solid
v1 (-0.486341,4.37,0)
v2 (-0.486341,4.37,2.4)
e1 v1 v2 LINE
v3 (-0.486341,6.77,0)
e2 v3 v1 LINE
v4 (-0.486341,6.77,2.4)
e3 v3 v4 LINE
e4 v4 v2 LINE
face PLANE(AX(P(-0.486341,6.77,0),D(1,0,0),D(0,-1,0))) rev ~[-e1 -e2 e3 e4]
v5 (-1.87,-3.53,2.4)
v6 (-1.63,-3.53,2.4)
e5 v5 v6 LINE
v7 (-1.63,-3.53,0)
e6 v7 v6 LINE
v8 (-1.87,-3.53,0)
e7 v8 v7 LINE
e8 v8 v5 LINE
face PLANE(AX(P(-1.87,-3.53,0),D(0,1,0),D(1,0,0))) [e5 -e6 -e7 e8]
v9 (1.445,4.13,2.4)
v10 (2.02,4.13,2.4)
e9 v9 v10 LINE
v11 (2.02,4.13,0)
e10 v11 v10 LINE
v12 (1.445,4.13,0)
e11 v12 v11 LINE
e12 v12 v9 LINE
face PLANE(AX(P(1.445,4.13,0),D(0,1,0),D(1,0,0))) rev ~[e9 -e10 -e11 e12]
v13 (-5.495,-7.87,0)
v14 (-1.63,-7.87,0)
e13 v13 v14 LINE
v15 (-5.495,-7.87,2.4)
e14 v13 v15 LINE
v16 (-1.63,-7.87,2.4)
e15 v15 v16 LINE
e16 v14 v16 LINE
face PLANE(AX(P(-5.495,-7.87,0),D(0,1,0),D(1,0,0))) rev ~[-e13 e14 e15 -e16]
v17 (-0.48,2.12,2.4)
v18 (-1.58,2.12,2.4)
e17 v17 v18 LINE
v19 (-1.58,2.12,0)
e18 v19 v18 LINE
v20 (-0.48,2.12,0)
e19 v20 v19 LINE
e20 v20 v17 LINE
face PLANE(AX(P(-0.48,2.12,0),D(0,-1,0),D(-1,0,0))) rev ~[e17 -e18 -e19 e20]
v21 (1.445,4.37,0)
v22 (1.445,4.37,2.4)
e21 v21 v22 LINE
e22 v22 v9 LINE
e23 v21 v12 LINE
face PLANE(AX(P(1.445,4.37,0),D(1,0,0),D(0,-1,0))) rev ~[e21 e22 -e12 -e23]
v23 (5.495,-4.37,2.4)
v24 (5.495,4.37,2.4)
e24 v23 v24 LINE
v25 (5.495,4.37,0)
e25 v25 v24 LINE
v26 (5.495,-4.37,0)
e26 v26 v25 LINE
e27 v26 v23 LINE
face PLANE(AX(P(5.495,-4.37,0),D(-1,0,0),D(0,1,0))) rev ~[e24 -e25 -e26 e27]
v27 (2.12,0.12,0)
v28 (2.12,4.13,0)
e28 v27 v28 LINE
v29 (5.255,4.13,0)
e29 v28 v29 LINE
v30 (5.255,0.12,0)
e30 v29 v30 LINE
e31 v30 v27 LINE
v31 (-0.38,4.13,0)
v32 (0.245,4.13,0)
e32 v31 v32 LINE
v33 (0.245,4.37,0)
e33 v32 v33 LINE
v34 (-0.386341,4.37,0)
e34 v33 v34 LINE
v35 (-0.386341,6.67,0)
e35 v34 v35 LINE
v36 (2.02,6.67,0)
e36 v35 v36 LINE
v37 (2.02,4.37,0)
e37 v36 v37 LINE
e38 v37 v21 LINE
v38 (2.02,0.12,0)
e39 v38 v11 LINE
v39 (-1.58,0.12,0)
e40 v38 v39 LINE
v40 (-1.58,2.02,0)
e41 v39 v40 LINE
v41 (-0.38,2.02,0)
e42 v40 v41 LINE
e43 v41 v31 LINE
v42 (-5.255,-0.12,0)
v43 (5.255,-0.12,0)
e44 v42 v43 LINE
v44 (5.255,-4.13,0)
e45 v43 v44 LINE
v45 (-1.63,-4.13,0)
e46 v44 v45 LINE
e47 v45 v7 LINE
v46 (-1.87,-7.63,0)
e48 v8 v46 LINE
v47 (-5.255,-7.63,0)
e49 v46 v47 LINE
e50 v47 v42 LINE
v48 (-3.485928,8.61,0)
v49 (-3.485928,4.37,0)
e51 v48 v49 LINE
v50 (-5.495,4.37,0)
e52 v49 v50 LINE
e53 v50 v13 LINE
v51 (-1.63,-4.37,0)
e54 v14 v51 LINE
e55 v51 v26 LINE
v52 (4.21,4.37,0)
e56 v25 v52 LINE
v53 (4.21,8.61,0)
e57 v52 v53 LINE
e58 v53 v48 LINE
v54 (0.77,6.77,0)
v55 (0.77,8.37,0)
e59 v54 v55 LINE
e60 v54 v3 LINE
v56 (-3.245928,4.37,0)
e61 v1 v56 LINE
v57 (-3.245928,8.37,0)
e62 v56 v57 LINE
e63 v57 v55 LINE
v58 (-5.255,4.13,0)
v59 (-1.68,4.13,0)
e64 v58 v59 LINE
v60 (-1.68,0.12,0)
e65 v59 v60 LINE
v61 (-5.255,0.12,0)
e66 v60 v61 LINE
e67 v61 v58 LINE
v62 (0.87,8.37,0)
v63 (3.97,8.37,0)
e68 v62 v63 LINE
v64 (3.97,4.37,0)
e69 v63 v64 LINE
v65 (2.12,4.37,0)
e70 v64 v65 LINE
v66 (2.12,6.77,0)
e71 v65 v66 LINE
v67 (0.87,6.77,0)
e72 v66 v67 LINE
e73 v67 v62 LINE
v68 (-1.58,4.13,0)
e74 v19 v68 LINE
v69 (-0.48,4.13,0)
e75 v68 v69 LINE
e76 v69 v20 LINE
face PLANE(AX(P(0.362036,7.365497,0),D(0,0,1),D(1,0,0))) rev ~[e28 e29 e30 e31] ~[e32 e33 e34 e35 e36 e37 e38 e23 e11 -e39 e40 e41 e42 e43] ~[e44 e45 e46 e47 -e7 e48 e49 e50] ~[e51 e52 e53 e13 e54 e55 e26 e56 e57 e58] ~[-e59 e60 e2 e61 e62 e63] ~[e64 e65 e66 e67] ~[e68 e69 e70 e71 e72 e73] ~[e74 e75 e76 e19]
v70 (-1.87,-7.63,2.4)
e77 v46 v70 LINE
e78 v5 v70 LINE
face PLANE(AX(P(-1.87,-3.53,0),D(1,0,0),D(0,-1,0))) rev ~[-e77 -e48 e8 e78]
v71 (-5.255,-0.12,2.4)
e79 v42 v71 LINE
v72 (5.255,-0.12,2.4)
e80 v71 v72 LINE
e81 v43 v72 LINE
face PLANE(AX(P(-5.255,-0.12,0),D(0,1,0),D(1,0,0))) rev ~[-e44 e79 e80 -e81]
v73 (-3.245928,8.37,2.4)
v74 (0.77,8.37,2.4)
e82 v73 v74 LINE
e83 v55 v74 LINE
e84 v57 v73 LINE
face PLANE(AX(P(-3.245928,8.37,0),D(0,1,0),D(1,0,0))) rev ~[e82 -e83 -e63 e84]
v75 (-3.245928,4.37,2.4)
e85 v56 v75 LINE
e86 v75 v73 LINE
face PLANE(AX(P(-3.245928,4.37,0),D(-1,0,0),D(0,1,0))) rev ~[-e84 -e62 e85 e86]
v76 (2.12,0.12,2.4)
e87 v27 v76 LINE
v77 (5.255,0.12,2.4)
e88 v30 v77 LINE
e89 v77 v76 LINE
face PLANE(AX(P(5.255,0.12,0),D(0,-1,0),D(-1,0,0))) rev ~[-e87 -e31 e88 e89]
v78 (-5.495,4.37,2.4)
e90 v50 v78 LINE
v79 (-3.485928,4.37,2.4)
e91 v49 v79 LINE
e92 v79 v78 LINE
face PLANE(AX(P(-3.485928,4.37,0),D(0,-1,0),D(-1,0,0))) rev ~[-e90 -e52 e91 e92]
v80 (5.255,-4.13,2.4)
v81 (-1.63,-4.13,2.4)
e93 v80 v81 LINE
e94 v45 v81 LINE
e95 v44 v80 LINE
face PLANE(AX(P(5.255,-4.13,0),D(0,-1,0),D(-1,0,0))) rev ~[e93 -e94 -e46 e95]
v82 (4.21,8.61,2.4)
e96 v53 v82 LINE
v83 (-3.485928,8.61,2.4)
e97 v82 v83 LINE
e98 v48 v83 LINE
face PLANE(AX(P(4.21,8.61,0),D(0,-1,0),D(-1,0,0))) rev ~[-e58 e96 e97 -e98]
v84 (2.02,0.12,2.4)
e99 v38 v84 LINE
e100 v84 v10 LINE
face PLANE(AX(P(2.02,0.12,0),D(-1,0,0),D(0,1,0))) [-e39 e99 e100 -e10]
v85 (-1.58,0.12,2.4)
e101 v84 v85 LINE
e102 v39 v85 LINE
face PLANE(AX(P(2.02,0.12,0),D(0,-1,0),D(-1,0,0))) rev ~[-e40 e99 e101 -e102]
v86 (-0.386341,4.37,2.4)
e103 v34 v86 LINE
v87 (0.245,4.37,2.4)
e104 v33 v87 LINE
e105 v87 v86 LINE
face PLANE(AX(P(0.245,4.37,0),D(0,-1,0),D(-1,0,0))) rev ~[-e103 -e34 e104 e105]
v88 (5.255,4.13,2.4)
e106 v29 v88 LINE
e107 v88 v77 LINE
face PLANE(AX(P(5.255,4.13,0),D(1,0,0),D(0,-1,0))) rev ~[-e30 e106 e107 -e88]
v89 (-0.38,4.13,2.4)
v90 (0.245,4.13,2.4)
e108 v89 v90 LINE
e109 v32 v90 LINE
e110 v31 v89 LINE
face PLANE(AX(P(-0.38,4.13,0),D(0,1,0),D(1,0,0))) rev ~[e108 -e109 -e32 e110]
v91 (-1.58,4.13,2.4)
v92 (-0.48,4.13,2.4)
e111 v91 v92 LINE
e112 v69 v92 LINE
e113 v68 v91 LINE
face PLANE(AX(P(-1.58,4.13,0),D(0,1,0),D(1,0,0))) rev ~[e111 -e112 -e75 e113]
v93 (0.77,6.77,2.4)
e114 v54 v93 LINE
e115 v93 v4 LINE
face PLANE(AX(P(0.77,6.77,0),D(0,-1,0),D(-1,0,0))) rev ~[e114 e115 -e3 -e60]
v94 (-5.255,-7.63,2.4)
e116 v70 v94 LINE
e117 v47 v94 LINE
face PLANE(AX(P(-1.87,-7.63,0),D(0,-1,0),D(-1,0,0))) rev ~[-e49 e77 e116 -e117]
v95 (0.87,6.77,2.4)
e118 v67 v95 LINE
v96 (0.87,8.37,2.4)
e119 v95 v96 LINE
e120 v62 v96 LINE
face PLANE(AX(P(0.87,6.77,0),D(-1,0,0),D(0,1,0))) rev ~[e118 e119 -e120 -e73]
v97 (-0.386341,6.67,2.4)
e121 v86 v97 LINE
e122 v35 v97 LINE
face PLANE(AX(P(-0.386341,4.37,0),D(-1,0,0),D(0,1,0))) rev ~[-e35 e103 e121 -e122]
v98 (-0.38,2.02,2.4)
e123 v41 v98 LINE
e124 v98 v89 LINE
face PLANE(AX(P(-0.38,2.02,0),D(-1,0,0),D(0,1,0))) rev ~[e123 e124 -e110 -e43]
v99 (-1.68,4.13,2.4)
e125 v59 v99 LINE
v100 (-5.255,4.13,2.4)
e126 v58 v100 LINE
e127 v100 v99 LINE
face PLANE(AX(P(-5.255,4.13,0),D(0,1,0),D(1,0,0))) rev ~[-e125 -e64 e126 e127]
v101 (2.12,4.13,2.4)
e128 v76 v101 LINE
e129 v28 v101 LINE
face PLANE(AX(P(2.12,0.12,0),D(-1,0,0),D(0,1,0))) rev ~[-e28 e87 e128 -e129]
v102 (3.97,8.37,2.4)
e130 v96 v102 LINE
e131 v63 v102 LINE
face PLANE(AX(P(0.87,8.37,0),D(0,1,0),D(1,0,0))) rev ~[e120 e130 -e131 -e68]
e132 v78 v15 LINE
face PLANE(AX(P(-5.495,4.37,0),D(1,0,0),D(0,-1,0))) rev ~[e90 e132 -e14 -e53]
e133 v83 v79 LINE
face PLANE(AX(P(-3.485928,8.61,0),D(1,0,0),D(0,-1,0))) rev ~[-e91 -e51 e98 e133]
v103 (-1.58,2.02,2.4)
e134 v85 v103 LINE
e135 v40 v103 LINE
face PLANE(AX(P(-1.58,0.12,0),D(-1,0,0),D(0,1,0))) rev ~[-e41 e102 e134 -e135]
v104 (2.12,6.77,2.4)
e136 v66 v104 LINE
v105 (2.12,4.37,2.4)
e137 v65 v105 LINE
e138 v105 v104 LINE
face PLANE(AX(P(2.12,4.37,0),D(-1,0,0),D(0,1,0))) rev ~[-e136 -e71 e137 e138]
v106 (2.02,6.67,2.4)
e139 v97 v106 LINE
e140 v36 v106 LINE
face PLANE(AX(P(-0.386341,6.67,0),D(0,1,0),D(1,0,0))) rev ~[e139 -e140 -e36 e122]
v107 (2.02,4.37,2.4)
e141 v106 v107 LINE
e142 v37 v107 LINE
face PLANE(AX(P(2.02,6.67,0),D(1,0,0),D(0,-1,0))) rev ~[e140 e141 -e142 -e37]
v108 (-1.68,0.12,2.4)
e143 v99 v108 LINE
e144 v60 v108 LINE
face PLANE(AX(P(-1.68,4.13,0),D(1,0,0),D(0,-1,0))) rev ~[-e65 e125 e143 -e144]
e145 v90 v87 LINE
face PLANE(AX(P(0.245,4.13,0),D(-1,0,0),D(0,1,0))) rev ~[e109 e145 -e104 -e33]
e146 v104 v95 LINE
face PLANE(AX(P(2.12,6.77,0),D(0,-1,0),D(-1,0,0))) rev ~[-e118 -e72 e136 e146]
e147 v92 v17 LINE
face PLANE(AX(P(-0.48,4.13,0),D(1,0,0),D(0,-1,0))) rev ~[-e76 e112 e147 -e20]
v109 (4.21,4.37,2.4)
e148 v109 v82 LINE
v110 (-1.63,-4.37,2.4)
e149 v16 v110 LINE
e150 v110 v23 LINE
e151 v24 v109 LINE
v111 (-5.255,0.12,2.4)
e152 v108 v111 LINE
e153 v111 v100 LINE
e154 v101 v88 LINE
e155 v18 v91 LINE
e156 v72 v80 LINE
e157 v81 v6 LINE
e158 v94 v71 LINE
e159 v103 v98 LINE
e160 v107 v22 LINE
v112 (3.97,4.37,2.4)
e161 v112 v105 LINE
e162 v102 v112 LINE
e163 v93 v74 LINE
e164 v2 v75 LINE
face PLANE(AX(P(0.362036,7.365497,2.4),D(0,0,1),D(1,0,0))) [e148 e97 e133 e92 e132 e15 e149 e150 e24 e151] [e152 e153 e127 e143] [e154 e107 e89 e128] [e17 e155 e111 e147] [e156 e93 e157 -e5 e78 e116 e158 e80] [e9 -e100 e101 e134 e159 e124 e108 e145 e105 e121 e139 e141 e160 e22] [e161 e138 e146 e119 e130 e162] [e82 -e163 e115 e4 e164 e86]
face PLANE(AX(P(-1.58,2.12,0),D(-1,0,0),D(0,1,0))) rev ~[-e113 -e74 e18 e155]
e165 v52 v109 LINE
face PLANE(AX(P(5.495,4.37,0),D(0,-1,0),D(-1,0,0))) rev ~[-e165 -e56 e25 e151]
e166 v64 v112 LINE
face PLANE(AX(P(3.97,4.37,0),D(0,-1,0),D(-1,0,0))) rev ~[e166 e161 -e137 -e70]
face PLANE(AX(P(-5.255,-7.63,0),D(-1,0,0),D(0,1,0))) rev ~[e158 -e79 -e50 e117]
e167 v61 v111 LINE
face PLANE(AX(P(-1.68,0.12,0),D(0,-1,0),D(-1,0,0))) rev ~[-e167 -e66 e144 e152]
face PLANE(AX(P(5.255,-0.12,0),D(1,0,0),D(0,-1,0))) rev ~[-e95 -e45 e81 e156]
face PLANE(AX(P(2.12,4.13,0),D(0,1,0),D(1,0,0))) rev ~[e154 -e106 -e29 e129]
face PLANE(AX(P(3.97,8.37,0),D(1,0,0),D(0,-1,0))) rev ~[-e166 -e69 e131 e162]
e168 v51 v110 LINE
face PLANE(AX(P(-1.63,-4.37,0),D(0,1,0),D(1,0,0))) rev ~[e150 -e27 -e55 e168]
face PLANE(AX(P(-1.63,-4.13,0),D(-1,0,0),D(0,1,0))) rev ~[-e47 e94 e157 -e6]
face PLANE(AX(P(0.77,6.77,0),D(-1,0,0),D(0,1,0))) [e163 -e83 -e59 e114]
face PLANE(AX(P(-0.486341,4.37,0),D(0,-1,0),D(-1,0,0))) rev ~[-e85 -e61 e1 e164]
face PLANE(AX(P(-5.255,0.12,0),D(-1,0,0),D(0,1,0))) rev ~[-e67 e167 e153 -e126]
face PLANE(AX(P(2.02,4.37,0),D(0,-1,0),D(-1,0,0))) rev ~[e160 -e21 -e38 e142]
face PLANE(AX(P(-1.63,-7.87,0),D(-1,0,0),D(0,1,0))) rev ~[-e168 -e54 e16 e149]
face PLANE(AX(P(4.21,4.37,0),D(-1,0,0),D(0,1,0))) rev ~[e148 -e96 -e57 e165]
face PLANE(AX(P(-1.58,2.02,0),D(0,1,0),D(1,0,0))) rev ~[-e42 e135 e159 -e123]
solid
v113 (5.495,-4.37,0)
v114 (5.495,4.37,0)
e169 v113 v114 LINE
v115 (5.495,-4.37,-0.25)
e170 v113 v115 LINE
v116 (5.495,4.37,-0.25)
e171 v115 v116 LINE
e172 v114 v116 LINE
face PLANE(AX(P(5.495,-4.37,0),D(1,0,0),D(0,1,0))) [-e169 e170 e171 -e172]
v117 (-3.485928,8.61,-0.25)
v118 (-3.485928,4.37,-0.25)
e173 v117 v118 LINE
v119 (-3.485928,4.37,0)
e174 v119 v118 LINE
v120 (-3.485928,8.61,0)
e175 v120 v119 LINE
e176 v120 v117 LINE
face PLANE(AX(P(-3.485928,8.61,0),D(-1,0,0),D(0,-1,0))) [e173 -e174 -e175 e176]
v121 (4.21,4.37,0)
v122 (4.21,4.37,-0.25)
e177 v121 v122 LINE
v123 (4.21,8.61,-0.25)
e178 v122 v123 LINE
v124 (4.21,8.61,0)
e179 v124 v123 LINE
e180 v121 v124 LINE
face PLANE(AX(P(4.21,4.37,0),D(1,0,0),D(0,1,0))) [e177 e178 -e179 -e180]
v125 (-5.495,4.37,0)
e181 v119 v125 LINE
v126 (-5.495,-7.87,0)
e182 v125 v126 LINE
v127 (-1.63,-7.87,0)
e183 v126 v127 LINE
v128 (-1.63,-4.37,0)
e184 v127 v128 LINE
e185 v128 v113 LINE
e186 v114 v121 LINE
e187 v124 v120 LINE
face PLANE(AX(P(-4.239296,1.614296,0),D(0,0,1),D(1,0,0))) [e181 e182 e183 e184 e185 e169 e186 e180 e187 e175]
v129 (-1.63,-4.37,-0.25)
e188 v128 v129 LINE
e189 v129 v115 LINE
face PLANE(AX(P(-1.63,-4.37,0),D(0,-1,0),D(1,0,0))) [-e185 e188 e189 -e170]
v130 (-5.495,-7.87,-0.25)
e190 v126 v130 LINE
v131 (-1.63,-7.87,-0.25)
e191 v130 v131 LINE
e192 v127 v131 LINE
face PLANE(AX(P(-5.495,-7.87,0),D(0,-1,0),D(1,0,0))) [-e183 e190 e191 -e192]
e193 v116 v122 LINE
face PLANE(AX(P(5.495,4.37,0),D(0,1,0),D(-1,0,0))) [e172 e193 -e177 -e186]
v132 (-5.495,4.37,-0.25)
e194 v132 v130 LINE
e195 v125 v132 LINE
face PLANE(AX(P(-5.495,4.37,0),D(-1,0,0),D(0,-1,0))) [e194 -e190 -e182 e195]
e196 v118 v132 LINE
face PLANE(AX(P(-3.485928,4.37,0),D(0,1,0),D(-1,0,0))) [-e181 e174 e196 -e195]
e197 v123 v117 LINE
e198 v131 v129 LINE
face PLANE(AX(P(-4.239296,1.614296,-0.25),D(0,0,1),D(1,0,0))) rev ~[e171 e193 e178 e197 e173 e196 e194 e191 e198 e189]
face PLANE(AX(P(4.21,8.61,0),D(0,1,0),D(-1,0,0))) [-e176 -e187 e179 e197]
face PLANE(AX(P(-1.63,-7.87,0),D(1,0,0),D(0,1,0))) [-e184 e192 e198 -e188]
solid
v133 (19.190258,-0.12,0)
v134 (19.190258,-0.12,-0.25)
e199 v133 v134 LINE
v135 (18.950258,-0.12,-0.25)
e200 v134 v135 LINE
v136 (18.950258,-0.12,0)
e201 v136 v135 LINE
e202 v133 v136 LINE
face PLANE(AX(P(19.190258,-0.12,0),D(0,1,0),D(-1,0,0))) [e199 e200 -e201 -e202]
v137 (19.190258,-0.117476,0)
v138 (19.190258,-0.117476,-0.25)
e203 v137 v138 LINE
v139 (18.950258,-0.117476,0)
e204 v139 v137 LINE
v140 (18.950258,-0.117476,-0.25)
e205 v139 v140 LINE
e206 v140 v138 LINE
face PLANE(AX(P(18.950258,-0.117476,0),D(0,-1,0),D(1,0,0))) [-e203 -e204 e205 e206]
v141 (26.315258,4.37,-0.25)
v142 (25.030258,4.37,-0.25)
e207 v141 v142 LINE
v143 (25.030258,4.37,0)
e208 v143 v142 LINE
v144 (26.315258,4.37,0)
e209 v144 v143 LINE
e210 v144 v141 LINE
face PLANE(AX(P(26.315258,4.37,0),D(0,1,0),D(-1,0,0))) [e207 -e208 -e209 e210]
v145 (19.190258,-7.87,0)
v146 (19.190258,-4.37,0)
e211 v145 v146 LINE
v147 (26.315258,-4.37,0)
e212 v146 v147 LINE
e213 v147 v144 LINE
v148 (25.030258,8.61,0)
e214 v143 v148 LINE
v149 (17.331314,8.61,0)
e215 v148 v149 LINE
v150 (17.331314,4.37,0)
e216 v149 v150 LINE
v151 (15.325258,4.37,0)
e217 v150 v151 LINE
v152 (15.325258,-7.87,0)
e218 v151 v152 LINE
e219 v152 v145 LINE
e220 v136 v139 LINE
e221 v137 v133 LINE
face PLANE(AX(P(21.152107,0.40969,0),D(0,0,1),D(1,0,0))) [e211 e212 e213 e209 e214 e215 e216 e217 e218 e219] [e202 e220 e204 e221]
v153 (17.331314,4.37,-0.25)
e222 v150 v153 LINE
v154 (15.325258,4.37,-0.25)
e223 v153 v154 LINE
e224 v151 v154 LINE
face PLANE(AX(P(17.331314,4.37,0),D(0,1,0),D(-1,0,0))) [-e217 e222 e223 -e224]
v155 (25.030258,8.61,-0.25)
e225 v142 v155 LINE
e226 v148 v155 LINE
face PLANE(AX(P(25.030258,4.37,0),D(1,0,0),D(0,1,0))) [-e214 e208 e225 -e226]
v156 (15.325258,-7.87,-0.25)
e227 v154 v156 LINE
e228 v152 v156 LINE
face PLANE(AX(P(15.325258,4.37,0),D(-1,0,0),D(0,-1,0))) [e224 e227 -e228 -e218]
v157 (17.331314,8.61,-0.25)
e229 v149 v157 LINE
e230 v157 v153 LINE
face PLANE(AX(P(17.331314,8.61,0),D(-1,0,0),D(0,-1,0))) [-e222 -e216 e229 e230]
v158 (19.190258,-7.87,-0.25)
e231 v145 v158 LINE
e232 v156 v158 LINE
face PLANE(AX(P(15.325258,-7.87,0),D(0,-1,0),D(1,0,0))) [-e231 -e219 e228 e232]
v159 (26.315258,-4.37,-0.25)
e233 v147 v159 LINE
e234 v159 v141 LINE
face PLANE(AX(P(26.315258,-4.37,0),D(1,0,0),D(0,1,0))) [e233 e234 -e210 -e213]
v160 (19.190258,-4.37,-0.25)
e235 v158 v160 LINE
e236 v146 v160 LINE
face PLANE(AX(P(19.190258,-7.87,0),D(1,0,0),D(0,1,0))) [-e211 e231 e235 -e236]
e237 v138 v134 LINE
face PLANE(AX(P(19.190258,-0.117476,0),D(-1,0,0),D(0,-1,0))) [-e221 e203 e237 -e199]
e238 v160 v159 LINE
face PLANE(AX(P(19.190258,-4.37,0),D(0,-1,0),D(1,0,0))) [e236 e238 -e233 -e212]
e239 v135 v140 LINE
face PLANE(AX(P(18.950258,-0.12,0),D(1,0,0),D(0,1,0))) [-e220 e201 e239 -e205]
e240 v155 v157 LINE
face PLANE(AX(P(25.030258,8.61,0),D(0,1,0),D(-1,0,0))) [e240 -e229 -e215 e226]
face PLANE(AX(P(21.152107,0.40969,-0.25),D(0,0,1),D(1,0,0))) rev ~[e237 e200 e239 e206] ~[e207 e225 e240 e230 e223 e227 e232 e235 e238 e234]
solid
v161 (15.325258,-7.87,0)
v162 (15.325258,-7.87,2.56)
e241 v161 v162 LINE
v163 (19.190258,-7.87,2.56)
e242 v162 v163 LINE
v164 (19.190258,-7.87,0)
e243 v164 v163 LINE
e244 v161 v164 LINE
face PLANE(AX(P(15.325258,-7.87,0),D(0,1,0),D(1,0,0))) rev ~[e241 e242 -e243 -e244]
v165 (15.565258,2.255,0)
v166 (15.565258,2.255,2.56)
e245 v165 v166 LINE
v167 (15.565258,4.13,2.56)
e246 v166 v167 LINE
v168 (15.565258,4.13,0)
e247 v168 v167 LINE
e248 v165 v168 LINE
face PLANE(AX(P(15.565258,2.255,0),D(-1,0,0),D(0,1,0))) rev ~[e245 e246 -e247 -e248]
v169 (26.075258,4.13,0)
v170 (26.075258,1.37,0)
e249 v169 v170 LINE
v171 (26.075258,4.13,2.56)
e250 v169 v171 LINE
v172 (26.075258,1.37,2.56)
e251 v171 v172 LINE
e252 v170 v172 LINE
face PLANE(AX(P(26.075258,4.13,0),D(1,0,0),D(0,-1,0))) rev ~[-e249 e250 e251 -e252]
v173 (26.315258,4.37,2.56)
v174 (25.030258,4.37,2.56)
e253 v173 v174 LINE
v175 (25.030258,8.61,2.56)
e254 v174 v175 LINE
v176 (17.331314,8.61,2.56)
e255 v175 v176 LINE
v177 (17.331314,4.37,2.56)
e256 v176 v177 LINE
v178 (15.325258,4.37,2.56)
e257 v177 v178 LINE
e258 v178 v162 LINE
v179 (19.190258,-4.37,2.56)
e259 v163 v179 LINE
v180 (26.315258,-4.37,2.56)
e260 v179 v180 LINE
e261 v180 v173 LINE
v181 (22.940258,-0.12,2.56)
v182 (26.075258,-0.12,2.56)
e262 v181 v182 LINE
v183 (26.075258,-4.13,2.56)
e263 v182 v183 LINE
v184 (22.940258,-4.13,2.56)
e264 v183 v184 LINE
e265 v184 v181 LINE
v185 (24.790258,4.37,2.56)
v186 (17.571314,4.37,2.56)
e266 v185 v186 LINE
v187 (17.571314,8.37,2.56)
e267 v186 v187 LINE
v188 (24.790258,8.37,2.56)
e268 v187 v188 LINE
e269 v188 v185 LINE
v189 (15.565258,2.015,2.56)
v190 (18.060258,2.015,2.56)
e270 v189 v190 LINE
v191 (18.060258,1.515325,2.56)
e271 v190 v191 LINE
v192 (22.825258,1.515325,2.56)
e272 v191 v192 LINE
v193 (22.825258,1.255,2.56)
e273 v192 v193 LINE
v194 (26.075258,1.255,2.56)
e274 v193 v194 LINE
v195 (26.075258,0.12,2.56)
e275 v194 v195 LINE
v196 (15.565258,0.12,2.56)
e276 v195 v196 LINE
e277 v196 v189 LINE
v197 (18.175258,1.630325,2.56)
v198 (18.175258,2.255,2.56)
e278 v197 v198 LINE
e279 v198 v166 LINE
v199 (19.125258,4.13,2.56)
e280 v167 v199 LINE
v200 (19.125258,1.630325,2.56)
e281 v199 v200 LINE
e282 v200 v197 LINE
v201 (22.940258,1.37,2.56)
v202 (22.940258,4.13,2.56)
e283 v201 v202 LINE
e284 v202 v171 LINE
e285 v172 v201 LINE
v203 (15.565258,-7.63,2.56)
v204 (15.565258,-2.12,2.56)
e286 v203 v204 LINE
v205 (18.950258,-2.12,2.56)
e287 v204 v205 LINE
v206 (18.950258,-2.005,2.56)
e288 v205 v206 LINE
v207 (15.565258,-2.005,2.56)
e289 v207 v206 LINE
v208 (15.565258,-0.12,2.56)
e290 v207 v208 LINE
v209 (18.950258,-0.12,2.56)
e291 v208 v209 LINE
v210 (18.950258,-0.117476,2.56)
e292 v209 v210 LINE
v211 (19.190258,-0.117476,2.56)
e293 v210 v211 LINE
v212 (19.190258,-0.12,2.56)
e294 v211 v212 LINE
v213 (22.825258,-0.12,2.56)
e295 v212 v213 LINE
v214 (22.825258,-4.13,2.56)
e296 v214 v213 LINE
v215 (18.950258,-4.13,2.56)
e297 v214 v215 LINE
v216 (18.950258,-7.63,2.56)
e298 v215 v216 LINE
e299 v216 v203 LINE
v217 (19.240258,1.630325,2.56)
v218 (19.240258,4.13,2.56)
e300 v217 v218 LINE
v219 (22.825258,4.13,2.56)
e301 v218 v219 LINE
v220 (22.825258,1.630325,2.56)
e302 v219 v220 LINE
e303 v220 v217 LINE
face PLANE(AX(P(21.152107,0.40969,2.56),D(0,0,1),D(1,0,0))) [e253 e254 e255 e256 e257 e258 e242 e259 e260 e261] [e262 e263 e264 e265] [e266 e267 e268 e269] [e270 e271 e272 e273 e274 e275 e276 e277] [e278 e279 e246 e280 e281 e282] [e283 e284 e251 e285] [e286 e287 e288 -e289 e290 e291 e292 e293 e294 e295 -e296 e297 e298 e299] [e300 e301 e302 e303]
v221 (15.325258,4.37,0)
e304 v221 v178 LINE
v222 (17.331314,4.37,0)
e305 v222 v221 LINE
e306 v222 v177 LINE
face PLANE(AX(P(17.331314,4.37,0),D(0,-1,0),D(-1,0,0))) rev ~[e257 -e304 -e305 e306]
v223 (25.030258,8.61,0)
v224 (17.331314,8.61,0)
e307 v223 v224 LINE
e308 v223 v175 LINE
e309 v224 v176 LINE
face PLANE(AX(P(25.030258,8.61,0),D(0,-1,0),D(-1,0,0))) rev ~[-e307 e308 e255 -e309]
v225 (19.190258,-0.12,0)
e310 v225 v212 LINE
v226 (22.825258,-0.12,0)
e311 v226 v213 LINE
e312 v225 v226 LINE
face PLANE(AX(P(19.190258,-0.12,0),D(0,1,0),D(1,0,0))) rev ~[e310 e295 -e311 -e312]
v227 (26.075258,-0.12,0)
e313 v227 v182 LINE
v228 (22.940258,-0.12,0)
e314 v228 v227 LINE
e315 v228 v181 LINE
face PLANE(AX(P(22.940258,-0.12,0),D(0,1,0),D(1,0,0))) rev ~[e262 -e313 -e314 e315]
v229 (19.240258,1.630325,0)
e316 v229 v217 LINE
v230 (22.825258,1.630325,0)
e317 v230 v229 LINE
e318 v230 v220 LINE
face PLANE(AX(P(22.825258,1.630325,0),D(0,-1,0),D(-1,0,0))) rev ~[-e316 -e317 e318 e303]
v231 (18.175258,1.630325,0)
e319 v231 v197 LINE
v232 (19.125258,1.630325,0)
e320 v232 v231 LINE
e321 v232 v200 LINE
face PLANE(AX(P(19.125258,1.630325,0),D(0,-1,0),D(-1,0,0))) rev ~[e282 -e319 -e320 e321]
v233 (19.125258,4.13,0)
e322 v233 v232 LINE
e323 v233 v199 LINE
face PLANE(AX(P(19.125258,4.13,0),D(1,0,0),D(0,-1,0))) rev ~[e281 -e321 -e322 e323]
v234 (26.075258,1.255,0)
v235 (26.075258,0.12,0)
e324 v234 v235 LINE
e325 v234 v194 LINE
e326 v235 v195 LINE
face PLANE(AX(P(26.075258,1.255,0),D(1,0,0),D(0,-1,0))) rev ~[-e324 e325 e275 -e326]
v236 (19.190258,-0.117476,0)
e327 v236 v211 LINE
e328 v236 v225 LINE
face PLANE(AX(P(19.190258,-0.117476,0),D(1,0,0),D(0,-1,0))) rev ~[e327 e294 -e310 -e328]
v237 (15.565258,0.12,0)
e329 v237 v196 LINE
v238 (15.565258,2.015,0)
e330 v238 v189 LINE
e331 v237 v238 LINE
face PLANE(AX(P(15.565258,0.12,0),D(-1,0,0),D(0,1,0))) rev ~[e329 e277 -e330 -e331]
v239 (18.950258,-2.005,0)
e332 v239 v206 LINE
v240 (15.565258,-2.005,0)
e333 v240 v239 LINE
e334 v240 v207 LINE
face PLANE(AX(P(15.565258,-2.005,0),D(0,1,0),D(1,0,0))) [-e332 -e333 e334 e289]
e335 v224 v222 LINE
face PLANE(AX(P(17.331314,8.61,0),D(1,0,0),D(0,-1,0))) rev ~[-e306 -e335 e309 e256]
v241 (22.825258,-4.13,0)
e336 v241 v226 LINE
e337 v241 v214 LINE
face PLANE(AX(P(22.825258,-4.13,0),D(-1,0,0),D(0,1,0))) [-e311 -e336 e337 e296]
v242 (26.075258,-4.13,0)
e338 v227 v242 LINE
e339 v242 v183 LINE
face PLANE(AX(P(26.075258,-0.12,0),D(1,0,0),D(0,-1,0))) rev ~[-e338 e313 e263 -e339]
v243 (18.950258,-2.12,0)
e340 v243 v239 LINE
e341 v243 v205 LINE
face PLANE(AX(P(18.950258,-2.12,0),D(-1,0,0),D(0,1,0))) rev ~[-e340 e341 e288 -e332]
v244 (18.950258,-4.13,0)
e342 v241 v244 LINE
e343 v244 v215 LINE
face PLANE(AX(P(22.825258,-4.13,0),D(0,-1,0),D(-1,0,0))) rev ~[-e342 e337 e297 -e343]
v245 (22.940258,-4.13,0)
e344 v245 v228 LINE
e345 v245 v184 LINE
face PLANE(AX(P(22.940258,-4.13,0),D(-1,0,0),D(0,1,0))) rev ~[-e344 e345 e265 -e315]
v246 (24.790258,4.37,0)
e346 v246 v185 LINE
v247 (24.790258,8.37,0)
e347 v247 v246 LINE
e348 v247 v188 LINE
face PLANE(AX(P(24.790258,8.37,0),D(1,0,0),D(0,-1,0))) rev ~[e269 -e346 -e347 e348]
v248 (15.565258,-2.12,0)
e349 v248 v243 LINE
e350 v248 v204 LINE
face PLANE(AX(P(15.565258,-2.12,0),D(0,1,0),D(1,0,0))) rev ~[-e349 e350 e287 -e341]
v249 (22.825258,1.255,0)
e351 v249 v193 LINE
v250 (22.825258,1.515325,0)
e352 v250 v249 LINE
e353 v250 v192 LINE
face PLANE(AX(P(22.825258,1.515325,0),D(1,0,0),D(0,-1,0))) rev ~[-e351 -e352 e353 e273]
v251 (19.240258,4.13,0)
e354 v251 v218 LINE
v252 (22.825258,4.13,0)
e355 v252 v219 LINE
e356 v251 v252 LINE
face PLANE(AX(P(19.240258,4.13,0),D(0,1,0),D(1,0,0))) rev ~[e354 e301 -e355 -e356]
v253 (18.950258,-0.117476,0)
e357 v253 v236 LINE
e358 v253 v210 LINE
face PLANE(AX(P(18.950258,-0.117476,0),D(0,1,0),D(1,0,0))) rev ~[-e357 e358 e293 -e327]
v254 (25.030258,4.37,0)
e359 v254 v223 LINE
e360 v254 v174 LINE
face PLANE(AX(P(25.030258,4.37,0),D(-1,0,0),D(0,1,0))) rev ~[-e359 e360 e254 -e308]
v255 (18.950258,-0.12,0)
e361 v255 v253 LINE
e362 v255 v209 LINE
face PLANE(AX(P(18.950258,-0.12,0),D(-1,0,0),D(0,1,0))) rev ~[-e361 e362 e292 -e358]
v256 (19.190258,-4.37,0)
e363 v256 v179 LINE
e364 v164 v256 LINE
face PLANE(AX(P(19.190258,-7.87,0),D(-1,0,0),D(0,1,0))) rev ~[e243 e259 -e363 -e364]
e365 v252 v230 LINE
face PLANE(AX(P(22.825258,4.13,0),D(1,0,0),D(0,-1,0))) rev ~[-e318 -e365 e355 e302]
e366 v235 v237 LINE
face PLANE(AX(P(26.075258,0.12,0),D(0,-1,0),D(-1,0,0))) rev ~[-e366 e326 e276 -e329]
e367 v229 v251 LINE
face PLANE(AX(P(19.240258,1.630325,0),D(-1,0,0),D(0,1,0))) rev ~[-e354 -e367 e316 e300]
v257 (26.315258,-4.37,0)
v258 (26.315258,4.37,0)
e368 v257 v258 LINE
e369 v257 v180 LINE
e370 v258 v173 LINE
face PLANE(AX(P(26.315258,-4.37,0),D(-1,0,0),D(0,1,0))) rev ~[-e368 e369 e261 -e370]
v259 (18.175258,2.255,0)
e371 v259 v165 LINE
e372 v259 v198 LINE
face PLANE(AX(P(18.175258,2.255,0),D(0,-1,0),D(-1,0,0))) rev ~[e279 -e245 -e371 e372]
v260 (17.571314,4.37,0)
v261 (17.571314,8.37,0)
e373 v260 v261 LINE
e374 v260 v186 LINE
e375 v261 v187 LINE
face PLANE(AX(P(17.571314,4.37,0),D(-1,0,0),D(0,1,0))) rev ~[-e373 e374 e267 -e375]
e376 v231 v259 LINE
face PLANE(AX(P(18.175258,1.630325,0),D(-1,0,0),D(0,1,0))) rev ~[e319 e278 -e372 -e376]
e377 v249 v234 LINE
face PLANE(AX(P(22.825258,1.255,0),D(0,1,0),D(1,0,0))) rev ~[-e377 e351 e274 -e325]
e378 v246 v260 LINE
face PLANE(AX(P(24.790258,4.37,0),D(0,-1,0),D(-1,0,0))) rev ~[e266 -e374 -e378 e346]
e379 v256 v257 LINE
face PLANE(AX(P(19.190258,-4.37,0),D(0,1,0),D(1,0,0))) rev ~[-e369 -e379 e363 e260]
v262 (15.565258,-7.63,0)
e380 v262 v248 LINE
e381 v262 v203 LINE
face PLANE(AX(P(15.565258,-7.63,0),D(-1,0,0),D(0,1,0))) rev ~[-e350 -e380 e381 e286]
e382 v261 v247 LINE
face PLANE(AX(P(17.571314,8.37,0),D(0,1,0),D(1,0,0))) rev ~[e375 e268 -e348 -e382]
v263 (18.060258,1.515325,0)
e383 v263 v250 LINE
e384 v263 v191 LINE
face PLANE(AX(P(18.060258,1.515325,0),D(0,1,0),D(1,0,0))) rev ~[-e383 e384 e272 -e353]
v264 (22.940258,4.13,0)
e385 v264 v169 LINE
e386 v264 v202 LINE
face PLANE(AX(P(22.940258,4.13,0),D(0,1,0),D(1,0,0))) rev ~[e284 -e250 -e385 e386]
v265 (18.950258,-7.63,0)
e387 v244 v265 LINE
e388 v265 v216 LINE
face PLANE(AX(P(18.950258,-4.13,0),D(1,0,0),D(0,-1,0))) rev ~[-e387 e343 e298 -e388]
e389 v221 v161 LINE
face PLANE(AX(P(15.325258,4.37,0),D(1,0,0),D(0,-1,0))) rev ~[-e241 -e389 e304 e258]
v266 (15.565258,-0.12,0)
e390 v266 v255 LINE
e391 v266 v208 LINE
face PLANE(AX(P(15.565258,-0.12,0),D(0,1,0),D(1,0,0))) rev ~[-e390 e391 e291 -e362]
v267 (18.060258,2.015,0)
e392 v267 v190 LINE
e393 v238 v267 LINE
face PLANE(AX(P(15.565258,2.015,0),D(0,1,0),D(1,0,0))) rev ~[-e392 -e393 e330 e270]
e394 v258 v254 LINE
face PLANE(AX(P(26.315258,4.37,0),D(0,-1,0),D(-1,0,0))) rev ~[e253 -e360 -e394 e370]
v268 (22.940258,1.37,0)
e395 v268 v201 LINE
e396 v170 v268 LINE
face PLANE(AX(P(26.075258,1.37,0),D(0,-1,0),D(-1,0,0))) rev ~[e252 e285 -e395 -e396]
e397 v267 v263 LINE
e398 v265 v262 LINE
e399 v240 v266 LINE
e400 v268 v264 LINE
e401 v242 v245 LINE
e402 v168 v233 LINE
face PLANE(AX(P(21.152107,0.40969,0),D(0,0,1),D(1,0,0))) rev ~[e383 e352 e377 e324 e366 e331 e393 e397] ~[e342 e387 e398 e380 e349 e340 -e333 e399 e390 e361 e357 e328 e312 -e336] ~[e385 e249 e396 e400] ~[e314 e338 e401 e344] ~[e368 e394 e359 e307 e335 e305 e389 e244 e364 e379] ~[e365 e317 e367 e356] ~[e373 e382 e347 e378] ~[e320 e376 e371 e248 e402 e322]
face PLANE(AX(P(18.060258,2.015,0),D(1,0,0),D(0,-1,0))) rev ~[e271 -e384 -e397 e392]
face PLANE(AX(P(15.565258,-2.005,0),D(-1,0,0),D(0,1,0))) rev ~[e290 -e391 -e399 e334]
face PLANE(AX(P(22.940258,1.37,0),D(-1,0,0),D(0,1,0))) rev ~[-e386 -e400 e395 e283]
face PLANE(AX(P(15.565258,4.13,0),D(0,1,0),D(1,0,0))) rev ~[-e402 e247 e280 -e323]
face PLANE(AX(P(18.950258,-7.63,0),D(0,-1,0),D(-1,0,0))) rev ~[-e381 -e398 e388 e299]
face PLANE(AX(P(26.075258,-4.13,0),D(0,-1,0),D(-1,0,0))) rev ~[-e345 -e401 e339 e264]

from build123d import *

# Parameters (mm, degrees)
F0_W     = 3.385
F0_H     = 0.24
F0_H_2   = 3.26
F0_W_2   = 0.24
F0_W_3   = 0.1
F0_H_3   = 1.6
F0_H_4   = 0.6
F0_W_4   = 3.575
F0_H_5   = 4.01
F0_W_5   = 3.135
F0_W_6   = 1.2
F0_W_7   = 1.1
F0_H_6   = 2.01
F1_DEPTH = 0.25
F0_H_7   = 0.115
F0_W_8   = 3.635
F0_H_8   = 1.885
F0_W_9   = 0.115
F0_H_9   = 2.76
F2_DEPTH = 2.56
F3_DEPTH = 2.4


with BuildPart() as f1:
    # F0 (on Top) → F1 (new body)
    with BuildSketch(Plane.XY):
        Polygon((-3.4859280568, 4.37), (-5.495, 4.37), (-5.495, -4.37), (-5.255, -4.37), (-5.255, -4.13), (-5.255, -0.12), (-5.255, 0.12), (-5.255, 4.13), (-1.68, 4.13), (-1.58, 4.13), (-0.48, 4.13), (-0.38, 4.13), (0.245, 4.13), (0.245, 4.37), (-0.38, 4.37), (-0.386341276, 4.37), (-0.48, 4.37), (-0.486341276, 4.37), (-3.2459280568, 4.37), align=None)
        Polygon((-3.4859280568, 8.61), (-3.4859280568, 4.37), (-3.2459280568, 4.37), (-3.2459280568, 8.37), (0.77, 8.37), (0.87, 8.37), (3.97, 8.37), (3.97, 4.37), (4.21, 4.37), (4.21, 8.61), align=None)
        Polygon((-5.255, -4.37), (-5.495, -4.37), (-5.495, -7.87), (-1.63, -7.87), (-1.63, -4.37), (-1.87, -4.37), (-1.87, -7.63), (-5.255, -7.63), align=None)
        Polygon((-3.2459280568, 8.37), (-3.2459280568, 4.37), (-0.486341276, 4.37), (-0.486341276, 6.77), (-0.48, 6.77), (0.77, 6.77), (0.77, 8.37), align=None)
        with Locations((-3.5625, -4.25)):
            Rectangle(F0_W, F0_H)
        with Locations((-3.5625, -6)):
            Rectangle(F0_W, F0_H_2)
        Polygon((-0.486341276, 6.77), (-0.486341276, 4.37), (-0.48, 4.37), (-0.386341276, 4.37), (-0.386341276, 6.67), (-0.38, 6.67), (2.02, 6.67), (2.02, 4.37), (2.12, 4.37), (2.12, 6.5391240641), (2.12, 6.77), (0.87, 6.77), (0.77, 6.77), (-0.48, 6.77), align=None)
        with Locations((-1.75, -4.25)):
            Rectangle(F0_W_2, F0_H)
        Polygon((-5.255, -0.12), (-5.255, -4.13), (-1.87, -4.13), (-1.87, -3.53), (-1.63, -3.53), (-1.63, -4.13), (5.255, -4.13), (5.255, -0.12), align=None)
        with Locations((0.82, 7.57)):
            Rectangle(F0_W_3, F0_H_3)
        Polygon((5.495, 4.37), (4.21, 4.37), (3.97, 4.37), (2.12, 4.37), (2.02, 4.37), (1.445, 4.37), (1.445, 4.13), (2.02, 4.13), (2.12, 4.13), (5.255, 4.13), (5.255, 0.12), (5.255, -0.12), (5.255, -4.13), (-1.63, -4.13), (-1.63, -4.37), (5.495, -4.37), align=None)
        with Locations((-1.75, -3.83)):
            Rectangle(F0_W_2, F0_H_4)
        Polygon((-5.255, 0.12), (-5.255, -0.12), (5.255, -0.12), (5.255, 0.12), (2.12, 0.12), (2.02, 0.12), (-1.58, 0.12), (-1.68, 0.12), align=None)
        Polygon((-0.386341276, 6.67), (-0.386341276, 4.37), (-0.38, 4.37), (0.245, 4.37), (1.445, 4.37), (2.02, 4.37), (2.02, 6.67), (-0.38, 6.67), align=None)
        Polygon((3.97, 8.37), (0.87, 8.37), (0.87, 6.77), (2.12, 6.77), (2.12, 6.5391240641), (2.12, 4.37), (3.97, 4.37), align=None)
        with Locations((-3.4675, 2.125)):
            Rectangle(F0_W_4, F0_H_5)
        Polygon((-1.68, 4.13), (-1.68, 0.12), (-1.58, 0.12), (-1.58, 2.02), (-1.58, 2.12), (-1.58, 4.13), align=None)
        with Locations((3.6875, 2.125)):
            Rectangle(F0_W_5, F0_H_5)
        with Locations((0.845, 4.25)):
            Rectangle(F0_W_6, F0_H)
        Polygon((-1.58, 2.02), (-1.58, 0.12), (2.02, 0.12), (2.02, 4.13), (1.445, 4.13), (0.245, 4.13), (-0.38, 4.13), (-0.38, 2.02), align=None)
        with Locations((2.07, 2.125)):
            Rectangle(F0_W_3, F0_H_5)
        with Locations((-1.03, 3.125)):
            Rectangle(F0_W_7, F0_H_6)
        Polygon((-1.58, 2.12), (-1.58, 2.02), (-0.38, 2.02), (-0.38, 4.13), (-0.48, 4.13), (-0.48, 2.12), align=None)
    extrude(amount=-F1_DEPTH)


with BuildPart() as f1b:
    # F0 (on Top) → F1, piece 2 (new body)
    with BuildSketch(Plane.XY):
        Polygon((17.3313135152, 4.37), (15.3252581853, 4.37), (15.3252581853, -4.37), (15.5652581853, -4.37), (15.5652581853, -4.13), (15.5652581853, -2.12), (15.5652581853, -2.005), (15.5652581853, -0.12), (15.5652581853, 0.12), (15.5652581853, 2.015), (15.5652581853, 2.255), (15.5652581853, 4.13), (19.1252581853, 4.13), (19.1402581853, 4.13), (19.2402581853, 4.13), (20.3402581853, 4.13), (20.4402581853, 4.13), (22.8252581853, 4.13), (22.8402581853, 4.13), (22.9402581853, 4.13), (26.0752581853, 4.13), (26.0752581853, 1.37), (26.0752581853, 1.255), (26.0752581853, 0.12), (26.0752581853, -0.12), (26.0752581853, -4.13), (22.9402581853, -4.13), (22.8252581853, -4.13), (19.1902581853, -4.13), (19.1902581853, -4.37), (26.3152581853, -4.37), (26.3152581853, 4.37), (25.0302581853, 4.37), (24.7902581853, 4.37), (20.437241572, 4.37), (20.430900296, 4.37), (20.3402581853, 4.37), (20.330900296, 4.37), (17.5713135152, 4.37), align=None)
        Polygon((17.3313135152, 8.61), (17.3313135152, 4.37), (17.5713135152, 4.37), (17.5713135152, 8.37), (21.587241572, 8.37), (21.6902581853, 8.37), (24.7902581853, 8.37), (24.7902581853, 4.37), (25.0302581853, 4.37), (25.0302581853, 8.61), align=None)
        Polygon((15.5652581853, -4.37), (15.3252581853, -4.37), (15.3252581853, -7.87), (19.1902581853, -7.87), (19.1902581853, -4.37), (18.9502581853, -4.37), (18.9502581853, -7.63), (15.5652581853, -7.63), align=None)
        Polygon((17.5713135152, 8.37), (17.5713135152, 4.37), (20.330900296, 4.37), (20.3402581853, 4.37), (20.430900296, 4.37), (20.437241572, 4.37), (24.7902581853, 4.37), (24.7902581853, 8.37), (21.6902581853, 8.37), (21.587241572, 8.37), align=None)
        with Locations((17.2577581853, -4.25)):
            Rectangle(F0_W, F0_H)
        with Locations((17.2577581853, -6)):
            Rectangle(F0_W, F0_H_2)
        with Locations((19.0702581853, -4.25)):
            Rectangle(F0_W_2, F0_H)
        with Locations((17.2577581853, -3.125)):
            Rectangle(F0_W, F0_H_6)
        Polygon((18.9502581853, -2.12), (18.9502581853, -4.13), (19.1902581853, -4.13), (19.1902581853, -0.12), (18.9502581853, -0.12), (18.9502581853, -2.005), align=None)
        with Locations((17.2577581853, -2.0625)):
            Rectangle(F0_W, F0_H_7)
        with Locations((21.0077581853, -2.125)):
            Rectangle(F0_W_8, F0_H_5)
        with Locations((17.2577581853, -1.0625)):
            Rectangle(F0_W, F0_H_8)
        with Locations((22.8827581853, -2.125)):
            Rectangle(F0_W_9, F0_H_5)
        Polygon((19.1902581853, -0.1174762056), (19.1902581853, -0.12), (22.8252581853, -0.12), (22.9402581853, -0.12), (26.0752581853, -0.12), (26.0752581853, 0.12), (22.9402581853, 0.12), (22.8402581853, 0.12), (19.2402581853, 0.12), (19.1402581853, 0.12), (15.5652581853, 0.12), (15.5652581853, -0.12), (18.9502581853, -0.12), (18.9502581853, -0.1174762056), align=None)
        with Locations((24.5077581853, -2.125)):
            Rectangle(F0_W_5, F0_H_5)
        Polygon((15.5652581853, 2.015), (15.5652581853, 0.12), (19.1402581853, 0.12), (19.2402581853, 0.12), (22.8402581853, 0.12), (22.9402581853, 0.12), (26.0752581853, 0.12), (26.0752581853, 1.255), (22.8252581853, 1.255), (22.8252581853, 1.5153254153), (18.0602581853, 1.5153254153), (18.0602581853, 2.015), align=None)
        Polygon((15.5652581853, 2.255), (15.5652581853, 2.015), (18.0602581853, 2.015), (18.0602581853, 1.5153254153), (22.8252581853, 1.5153254153), (22.8252581853, 1.6303254153), (19.2402581853, 1.6303254153), (19.1252581853, 1.6303254153), (18.1752581853, 1.6303254153), (18.1752581853, 2.255), align=None)
        Polygon((15.5652581853, 4.13), (15.5652581853, 2.255), (18.1752581853, 2.255), (18.1752581853, 1.6303254153), (19.1252581853, 1.6303254153), (19.1252581853, 4.13), align=None)
        Polygon((22.8252581853, 1.255), (26.0752581853, 1.255), (26.0752581853, 1.37), (22.9402581853, 1.37), (22.9402581853, 4.13), (22.8402581853, 4.13), (22.8252581853, 4.13), (22.8252581853, 1.6303254153), (22.8252581853, 1.5153254153), align=None)
        Polygon((19.1402581853, 4.13), (19.1252581853, 4.13), (19.1252581853, 1.6303254153), (19.2402581853, 1.6303254153), (19.2402581853, 4.13), align=None)
        with Locations((24.5077581853, 2.75)):
            Rectangle(F0_W_5, F0_H_9)
        Polygon((19.2402581853, 1.6303254153), (22.8252581853, 1.6303254153), (22.8252581853, 4.13), (20.4402581853, 4.13), (20.3402581853, 4.13), (19.2402581853, 4.13), align=None)
    extrude(amount=-F1_DEPTH)


with BuildPart() as f2:
    # F0 (on Top) → F2 (new body)
    with BuildSketch(Plane.XY):
        Polygon((17.3313135152, 4.37), (15.3252581853, 4.37), (15.3252581853, -4.37), (15.5652581853, -4.37), (15.5652581853, -4.13), (15.5652581853, -2.12), (15.5652581853, -2.005), (15.5652581853, -0.12), (15.5652581853, 0.12), (15.5652581853, 2.015), (15.5652581853, 2.255), (15.5652581853, 4.13), (19.1252581853, 4.13), (19.1402581853, 4.13), (19.2402581853, 4.13), (20.3402581853, 4.13), (20.4402581853, 4.13), (22.8252581853, 4.13), (22.8402581853, 4.13), (22.9402581853, 4.13), (26.0752581853, 4.13), (26.0752581853, 1.37), (26.0752581853, 1.255), (26.0752581853, 0.12), (26.0752581853, -0.12), (26.0752581853, -4.13), (22.9402581853, -4.13), (22.8252581853, -4.13), (19.1902581853, -4.13), (19.1902581853, -4.37), (26.3152581853, -4.37), (26.3152581853, 4.37), (25.0302581853, 4.37), (24.7902581853, 4.37), (20.437241572, 4.37), (20.430900296, 4.37), (20.3402581853, 4.37), (20.330900296, 4.37), (17.5713135152, 4.37), align=None)
        Polygon((15.5652581853, 2.255), (15.5652581853, 2.015), (18.0602581853, 2.015), (18.0602581853, 1.5153254153), (22.8252581853, 1.5153254153), (22.8252581853, 1.6303254153), (19.2402581853, 1.6303254153), (19.1252581853, 1.6303254153), (18.1752581853, 1.6303254153), (18.1752581853, 2.255), align=None)
        with Locations((19.0702581853, -4.25)):
            Rectangle(F0_W_2, F0_H)
        Polygon((19.1402581853, 4.13), (19.1252581853, 4.13), (19.1252581853, 1.6303254153), (19.2402581853, 1.6303254153), (19.2402581853, 4.13), align=None)
        Polygon((22.8252581853, 1.255), (26.0752581853, 1.255), (26.0752581853, 1.37), (22.9402581853, 1.37), (22.9402581853, 4.13), (22.8402581853, 4.13), (22.8252581853, 4.13), (22.8252581853, 1.6303254153), (22.8252581853, 1.5153254153), align=None)
        with Locations((22.8827581853, -2.125)):
            Rectangle(F0_W_9, F0_H_5)
        Polygon((19.1902581853, -0.1174762056), (19.1902581853, -0.12), (22.8252581853, -0.12), (22.9402581853, -0.12), (26.0752581853, -0.12), (26.0752581853, 0.12), (22.9402581853, 0.12), (22.8402581853, 0.12), (19.2402581853, 0.12), (19.1402581853, 0.12), (15.5652581853, 0.12), (15.5652581853, -0.12), (18.9502581853, -0.12), (18.9502581853, -0.1174762056), align=None)
        with Locations((17.2577581853, -2.0625)):
            Rectangle(F0_W, F0_H_7)
        Polygon((15.5652581853, -4.37), (15.3252581853, -4.37), (15.3252581853, -7.87), (19.1902581853, -7.87), (19.1902581853, -4.37), (18.9502581853, -4.37), (18.9502581853, -7.63), (15.5652581853, -7.63), align=None)
        Polygon((17.3313135152, 8.61), (17.3313135152, 4.37), (17.5713135152, 4.37), (17.5713135152, 8.37), (21.587241572, 8.37), (21.6902581853, 8.37), (24.7902581853, 8.37), (24.7902581853, 4.37), (25.0302581853, 4.37), (25.0302581853, 8.61), align=None)
    extrude(amount=F2_DEPTH)


with BuildPart() as f3:
    # F0 (on Top) → F3 (new body)
    with BuildSketch(Plane.XY):
        Polygon((-3.4859280568, 8.61), (-3.4859280568, 4.37), (-3.2459280568, 4.37), (-3.2459280568, 8.37), (0.77, 8.37), (0.87, 8.37), (3.97, 8.37), (3.97, 4.37), (4.21, 4.37), (4.21, 8.61), align=None)
        Polygon((5.495, 4.37), (4.21, 4.37), (3.97, 4.37), (2.12, 4.37), (2.02, 4.37), (1.445, 4.37), (1.445, 4.13), (2.02, 4.13), (2.12, 4.13), (5.255, 4.13), (5.255, 0.12), (5.255, -0.12), (5.255, -4.13), (-1.63, -4.13), (-1.63, -4.37), (5.495, -4.37), align=None)
        Polygon((-3.4859280568, 4.37), (-5.495, 4.37), (-5.495, -4.37), (-5.255, -4.37), (-5.255, -4.13), (-5.255, -0.12), (-5.255, 0.12), (-5.255, 4.13), (-1.68, 4.13), (-1.58, 4.13), (-0.48, 4.13), (-0.38, 4.13), (0.245, 4.13), (0.245, 4.37), (-0.38, 4.37), (-0.386341276, 4.37), (-0.48, 4.37), (-0.486341276, 4.37), (-3.2459280568, 4.37), align=None)
        Polygon((-5.255, -4.37), (-5.495, -4.37), (-5.495, -7.87), (-1.63, -7.87), (-1.63, -4.37), (-1.87, -4.37), (-1.87, -7.63), (-5.255, -7.63), align=None)
        with Locations((-1.75, -4.25)):
            Rectangle(F0_W_2, F0_H)
        with Locations((-1.75, -3.83)):
            Rectangle(F0_W_2, F0_H_4)
        Polygon((-5.255, 0.12), (-5.255, -0.12), (5.255, -0.12), (5.255, 0.12), (2.12, 0.12), (2.02, 0.12), (-1.58, 0.12), (-1.68, 0.12), align=None)
        Polygon((-1.68, 4.13), (-1.68, 0.12), (-1.58, 0.12), (-1.58, 2.02), (-1.58, 2.12), (-1.58, 4.13), align=None)
        with Locations((2.07, 2.125)):
            Rectangle(F0_W_3, F0_H_5)
        Polygon((-1.58, 2.12), (-1.58, 2.02), (-0.38, 2.02), (-0.38, 4.13), (-0.48, 4.13), (-0.48, 2.12), align=None)
        Polygon((-0.486341276, 6.77), (-0.486341276, 4.37), (-0.48, 4.37), (-0.386341276, 4.37), (-0.386341276, 6.67), (-0.38, 6.67), (2.02, 6.67), (2.02, 4.37), (2.12, 4.37), (2.12, 6.5391240641), (2.12, 6.77), (0.87, 6.77), (0.77, 6.77), (-0.48, 6.77), align=None)
        with Locations((0.82, 7.57)):
            Rectangle(F0_W_3, F0_H_3)
    extrude(amount=F3_DEPTH)


solid = Compound([f1.part, f1b.part, f2.part, f3.part])
